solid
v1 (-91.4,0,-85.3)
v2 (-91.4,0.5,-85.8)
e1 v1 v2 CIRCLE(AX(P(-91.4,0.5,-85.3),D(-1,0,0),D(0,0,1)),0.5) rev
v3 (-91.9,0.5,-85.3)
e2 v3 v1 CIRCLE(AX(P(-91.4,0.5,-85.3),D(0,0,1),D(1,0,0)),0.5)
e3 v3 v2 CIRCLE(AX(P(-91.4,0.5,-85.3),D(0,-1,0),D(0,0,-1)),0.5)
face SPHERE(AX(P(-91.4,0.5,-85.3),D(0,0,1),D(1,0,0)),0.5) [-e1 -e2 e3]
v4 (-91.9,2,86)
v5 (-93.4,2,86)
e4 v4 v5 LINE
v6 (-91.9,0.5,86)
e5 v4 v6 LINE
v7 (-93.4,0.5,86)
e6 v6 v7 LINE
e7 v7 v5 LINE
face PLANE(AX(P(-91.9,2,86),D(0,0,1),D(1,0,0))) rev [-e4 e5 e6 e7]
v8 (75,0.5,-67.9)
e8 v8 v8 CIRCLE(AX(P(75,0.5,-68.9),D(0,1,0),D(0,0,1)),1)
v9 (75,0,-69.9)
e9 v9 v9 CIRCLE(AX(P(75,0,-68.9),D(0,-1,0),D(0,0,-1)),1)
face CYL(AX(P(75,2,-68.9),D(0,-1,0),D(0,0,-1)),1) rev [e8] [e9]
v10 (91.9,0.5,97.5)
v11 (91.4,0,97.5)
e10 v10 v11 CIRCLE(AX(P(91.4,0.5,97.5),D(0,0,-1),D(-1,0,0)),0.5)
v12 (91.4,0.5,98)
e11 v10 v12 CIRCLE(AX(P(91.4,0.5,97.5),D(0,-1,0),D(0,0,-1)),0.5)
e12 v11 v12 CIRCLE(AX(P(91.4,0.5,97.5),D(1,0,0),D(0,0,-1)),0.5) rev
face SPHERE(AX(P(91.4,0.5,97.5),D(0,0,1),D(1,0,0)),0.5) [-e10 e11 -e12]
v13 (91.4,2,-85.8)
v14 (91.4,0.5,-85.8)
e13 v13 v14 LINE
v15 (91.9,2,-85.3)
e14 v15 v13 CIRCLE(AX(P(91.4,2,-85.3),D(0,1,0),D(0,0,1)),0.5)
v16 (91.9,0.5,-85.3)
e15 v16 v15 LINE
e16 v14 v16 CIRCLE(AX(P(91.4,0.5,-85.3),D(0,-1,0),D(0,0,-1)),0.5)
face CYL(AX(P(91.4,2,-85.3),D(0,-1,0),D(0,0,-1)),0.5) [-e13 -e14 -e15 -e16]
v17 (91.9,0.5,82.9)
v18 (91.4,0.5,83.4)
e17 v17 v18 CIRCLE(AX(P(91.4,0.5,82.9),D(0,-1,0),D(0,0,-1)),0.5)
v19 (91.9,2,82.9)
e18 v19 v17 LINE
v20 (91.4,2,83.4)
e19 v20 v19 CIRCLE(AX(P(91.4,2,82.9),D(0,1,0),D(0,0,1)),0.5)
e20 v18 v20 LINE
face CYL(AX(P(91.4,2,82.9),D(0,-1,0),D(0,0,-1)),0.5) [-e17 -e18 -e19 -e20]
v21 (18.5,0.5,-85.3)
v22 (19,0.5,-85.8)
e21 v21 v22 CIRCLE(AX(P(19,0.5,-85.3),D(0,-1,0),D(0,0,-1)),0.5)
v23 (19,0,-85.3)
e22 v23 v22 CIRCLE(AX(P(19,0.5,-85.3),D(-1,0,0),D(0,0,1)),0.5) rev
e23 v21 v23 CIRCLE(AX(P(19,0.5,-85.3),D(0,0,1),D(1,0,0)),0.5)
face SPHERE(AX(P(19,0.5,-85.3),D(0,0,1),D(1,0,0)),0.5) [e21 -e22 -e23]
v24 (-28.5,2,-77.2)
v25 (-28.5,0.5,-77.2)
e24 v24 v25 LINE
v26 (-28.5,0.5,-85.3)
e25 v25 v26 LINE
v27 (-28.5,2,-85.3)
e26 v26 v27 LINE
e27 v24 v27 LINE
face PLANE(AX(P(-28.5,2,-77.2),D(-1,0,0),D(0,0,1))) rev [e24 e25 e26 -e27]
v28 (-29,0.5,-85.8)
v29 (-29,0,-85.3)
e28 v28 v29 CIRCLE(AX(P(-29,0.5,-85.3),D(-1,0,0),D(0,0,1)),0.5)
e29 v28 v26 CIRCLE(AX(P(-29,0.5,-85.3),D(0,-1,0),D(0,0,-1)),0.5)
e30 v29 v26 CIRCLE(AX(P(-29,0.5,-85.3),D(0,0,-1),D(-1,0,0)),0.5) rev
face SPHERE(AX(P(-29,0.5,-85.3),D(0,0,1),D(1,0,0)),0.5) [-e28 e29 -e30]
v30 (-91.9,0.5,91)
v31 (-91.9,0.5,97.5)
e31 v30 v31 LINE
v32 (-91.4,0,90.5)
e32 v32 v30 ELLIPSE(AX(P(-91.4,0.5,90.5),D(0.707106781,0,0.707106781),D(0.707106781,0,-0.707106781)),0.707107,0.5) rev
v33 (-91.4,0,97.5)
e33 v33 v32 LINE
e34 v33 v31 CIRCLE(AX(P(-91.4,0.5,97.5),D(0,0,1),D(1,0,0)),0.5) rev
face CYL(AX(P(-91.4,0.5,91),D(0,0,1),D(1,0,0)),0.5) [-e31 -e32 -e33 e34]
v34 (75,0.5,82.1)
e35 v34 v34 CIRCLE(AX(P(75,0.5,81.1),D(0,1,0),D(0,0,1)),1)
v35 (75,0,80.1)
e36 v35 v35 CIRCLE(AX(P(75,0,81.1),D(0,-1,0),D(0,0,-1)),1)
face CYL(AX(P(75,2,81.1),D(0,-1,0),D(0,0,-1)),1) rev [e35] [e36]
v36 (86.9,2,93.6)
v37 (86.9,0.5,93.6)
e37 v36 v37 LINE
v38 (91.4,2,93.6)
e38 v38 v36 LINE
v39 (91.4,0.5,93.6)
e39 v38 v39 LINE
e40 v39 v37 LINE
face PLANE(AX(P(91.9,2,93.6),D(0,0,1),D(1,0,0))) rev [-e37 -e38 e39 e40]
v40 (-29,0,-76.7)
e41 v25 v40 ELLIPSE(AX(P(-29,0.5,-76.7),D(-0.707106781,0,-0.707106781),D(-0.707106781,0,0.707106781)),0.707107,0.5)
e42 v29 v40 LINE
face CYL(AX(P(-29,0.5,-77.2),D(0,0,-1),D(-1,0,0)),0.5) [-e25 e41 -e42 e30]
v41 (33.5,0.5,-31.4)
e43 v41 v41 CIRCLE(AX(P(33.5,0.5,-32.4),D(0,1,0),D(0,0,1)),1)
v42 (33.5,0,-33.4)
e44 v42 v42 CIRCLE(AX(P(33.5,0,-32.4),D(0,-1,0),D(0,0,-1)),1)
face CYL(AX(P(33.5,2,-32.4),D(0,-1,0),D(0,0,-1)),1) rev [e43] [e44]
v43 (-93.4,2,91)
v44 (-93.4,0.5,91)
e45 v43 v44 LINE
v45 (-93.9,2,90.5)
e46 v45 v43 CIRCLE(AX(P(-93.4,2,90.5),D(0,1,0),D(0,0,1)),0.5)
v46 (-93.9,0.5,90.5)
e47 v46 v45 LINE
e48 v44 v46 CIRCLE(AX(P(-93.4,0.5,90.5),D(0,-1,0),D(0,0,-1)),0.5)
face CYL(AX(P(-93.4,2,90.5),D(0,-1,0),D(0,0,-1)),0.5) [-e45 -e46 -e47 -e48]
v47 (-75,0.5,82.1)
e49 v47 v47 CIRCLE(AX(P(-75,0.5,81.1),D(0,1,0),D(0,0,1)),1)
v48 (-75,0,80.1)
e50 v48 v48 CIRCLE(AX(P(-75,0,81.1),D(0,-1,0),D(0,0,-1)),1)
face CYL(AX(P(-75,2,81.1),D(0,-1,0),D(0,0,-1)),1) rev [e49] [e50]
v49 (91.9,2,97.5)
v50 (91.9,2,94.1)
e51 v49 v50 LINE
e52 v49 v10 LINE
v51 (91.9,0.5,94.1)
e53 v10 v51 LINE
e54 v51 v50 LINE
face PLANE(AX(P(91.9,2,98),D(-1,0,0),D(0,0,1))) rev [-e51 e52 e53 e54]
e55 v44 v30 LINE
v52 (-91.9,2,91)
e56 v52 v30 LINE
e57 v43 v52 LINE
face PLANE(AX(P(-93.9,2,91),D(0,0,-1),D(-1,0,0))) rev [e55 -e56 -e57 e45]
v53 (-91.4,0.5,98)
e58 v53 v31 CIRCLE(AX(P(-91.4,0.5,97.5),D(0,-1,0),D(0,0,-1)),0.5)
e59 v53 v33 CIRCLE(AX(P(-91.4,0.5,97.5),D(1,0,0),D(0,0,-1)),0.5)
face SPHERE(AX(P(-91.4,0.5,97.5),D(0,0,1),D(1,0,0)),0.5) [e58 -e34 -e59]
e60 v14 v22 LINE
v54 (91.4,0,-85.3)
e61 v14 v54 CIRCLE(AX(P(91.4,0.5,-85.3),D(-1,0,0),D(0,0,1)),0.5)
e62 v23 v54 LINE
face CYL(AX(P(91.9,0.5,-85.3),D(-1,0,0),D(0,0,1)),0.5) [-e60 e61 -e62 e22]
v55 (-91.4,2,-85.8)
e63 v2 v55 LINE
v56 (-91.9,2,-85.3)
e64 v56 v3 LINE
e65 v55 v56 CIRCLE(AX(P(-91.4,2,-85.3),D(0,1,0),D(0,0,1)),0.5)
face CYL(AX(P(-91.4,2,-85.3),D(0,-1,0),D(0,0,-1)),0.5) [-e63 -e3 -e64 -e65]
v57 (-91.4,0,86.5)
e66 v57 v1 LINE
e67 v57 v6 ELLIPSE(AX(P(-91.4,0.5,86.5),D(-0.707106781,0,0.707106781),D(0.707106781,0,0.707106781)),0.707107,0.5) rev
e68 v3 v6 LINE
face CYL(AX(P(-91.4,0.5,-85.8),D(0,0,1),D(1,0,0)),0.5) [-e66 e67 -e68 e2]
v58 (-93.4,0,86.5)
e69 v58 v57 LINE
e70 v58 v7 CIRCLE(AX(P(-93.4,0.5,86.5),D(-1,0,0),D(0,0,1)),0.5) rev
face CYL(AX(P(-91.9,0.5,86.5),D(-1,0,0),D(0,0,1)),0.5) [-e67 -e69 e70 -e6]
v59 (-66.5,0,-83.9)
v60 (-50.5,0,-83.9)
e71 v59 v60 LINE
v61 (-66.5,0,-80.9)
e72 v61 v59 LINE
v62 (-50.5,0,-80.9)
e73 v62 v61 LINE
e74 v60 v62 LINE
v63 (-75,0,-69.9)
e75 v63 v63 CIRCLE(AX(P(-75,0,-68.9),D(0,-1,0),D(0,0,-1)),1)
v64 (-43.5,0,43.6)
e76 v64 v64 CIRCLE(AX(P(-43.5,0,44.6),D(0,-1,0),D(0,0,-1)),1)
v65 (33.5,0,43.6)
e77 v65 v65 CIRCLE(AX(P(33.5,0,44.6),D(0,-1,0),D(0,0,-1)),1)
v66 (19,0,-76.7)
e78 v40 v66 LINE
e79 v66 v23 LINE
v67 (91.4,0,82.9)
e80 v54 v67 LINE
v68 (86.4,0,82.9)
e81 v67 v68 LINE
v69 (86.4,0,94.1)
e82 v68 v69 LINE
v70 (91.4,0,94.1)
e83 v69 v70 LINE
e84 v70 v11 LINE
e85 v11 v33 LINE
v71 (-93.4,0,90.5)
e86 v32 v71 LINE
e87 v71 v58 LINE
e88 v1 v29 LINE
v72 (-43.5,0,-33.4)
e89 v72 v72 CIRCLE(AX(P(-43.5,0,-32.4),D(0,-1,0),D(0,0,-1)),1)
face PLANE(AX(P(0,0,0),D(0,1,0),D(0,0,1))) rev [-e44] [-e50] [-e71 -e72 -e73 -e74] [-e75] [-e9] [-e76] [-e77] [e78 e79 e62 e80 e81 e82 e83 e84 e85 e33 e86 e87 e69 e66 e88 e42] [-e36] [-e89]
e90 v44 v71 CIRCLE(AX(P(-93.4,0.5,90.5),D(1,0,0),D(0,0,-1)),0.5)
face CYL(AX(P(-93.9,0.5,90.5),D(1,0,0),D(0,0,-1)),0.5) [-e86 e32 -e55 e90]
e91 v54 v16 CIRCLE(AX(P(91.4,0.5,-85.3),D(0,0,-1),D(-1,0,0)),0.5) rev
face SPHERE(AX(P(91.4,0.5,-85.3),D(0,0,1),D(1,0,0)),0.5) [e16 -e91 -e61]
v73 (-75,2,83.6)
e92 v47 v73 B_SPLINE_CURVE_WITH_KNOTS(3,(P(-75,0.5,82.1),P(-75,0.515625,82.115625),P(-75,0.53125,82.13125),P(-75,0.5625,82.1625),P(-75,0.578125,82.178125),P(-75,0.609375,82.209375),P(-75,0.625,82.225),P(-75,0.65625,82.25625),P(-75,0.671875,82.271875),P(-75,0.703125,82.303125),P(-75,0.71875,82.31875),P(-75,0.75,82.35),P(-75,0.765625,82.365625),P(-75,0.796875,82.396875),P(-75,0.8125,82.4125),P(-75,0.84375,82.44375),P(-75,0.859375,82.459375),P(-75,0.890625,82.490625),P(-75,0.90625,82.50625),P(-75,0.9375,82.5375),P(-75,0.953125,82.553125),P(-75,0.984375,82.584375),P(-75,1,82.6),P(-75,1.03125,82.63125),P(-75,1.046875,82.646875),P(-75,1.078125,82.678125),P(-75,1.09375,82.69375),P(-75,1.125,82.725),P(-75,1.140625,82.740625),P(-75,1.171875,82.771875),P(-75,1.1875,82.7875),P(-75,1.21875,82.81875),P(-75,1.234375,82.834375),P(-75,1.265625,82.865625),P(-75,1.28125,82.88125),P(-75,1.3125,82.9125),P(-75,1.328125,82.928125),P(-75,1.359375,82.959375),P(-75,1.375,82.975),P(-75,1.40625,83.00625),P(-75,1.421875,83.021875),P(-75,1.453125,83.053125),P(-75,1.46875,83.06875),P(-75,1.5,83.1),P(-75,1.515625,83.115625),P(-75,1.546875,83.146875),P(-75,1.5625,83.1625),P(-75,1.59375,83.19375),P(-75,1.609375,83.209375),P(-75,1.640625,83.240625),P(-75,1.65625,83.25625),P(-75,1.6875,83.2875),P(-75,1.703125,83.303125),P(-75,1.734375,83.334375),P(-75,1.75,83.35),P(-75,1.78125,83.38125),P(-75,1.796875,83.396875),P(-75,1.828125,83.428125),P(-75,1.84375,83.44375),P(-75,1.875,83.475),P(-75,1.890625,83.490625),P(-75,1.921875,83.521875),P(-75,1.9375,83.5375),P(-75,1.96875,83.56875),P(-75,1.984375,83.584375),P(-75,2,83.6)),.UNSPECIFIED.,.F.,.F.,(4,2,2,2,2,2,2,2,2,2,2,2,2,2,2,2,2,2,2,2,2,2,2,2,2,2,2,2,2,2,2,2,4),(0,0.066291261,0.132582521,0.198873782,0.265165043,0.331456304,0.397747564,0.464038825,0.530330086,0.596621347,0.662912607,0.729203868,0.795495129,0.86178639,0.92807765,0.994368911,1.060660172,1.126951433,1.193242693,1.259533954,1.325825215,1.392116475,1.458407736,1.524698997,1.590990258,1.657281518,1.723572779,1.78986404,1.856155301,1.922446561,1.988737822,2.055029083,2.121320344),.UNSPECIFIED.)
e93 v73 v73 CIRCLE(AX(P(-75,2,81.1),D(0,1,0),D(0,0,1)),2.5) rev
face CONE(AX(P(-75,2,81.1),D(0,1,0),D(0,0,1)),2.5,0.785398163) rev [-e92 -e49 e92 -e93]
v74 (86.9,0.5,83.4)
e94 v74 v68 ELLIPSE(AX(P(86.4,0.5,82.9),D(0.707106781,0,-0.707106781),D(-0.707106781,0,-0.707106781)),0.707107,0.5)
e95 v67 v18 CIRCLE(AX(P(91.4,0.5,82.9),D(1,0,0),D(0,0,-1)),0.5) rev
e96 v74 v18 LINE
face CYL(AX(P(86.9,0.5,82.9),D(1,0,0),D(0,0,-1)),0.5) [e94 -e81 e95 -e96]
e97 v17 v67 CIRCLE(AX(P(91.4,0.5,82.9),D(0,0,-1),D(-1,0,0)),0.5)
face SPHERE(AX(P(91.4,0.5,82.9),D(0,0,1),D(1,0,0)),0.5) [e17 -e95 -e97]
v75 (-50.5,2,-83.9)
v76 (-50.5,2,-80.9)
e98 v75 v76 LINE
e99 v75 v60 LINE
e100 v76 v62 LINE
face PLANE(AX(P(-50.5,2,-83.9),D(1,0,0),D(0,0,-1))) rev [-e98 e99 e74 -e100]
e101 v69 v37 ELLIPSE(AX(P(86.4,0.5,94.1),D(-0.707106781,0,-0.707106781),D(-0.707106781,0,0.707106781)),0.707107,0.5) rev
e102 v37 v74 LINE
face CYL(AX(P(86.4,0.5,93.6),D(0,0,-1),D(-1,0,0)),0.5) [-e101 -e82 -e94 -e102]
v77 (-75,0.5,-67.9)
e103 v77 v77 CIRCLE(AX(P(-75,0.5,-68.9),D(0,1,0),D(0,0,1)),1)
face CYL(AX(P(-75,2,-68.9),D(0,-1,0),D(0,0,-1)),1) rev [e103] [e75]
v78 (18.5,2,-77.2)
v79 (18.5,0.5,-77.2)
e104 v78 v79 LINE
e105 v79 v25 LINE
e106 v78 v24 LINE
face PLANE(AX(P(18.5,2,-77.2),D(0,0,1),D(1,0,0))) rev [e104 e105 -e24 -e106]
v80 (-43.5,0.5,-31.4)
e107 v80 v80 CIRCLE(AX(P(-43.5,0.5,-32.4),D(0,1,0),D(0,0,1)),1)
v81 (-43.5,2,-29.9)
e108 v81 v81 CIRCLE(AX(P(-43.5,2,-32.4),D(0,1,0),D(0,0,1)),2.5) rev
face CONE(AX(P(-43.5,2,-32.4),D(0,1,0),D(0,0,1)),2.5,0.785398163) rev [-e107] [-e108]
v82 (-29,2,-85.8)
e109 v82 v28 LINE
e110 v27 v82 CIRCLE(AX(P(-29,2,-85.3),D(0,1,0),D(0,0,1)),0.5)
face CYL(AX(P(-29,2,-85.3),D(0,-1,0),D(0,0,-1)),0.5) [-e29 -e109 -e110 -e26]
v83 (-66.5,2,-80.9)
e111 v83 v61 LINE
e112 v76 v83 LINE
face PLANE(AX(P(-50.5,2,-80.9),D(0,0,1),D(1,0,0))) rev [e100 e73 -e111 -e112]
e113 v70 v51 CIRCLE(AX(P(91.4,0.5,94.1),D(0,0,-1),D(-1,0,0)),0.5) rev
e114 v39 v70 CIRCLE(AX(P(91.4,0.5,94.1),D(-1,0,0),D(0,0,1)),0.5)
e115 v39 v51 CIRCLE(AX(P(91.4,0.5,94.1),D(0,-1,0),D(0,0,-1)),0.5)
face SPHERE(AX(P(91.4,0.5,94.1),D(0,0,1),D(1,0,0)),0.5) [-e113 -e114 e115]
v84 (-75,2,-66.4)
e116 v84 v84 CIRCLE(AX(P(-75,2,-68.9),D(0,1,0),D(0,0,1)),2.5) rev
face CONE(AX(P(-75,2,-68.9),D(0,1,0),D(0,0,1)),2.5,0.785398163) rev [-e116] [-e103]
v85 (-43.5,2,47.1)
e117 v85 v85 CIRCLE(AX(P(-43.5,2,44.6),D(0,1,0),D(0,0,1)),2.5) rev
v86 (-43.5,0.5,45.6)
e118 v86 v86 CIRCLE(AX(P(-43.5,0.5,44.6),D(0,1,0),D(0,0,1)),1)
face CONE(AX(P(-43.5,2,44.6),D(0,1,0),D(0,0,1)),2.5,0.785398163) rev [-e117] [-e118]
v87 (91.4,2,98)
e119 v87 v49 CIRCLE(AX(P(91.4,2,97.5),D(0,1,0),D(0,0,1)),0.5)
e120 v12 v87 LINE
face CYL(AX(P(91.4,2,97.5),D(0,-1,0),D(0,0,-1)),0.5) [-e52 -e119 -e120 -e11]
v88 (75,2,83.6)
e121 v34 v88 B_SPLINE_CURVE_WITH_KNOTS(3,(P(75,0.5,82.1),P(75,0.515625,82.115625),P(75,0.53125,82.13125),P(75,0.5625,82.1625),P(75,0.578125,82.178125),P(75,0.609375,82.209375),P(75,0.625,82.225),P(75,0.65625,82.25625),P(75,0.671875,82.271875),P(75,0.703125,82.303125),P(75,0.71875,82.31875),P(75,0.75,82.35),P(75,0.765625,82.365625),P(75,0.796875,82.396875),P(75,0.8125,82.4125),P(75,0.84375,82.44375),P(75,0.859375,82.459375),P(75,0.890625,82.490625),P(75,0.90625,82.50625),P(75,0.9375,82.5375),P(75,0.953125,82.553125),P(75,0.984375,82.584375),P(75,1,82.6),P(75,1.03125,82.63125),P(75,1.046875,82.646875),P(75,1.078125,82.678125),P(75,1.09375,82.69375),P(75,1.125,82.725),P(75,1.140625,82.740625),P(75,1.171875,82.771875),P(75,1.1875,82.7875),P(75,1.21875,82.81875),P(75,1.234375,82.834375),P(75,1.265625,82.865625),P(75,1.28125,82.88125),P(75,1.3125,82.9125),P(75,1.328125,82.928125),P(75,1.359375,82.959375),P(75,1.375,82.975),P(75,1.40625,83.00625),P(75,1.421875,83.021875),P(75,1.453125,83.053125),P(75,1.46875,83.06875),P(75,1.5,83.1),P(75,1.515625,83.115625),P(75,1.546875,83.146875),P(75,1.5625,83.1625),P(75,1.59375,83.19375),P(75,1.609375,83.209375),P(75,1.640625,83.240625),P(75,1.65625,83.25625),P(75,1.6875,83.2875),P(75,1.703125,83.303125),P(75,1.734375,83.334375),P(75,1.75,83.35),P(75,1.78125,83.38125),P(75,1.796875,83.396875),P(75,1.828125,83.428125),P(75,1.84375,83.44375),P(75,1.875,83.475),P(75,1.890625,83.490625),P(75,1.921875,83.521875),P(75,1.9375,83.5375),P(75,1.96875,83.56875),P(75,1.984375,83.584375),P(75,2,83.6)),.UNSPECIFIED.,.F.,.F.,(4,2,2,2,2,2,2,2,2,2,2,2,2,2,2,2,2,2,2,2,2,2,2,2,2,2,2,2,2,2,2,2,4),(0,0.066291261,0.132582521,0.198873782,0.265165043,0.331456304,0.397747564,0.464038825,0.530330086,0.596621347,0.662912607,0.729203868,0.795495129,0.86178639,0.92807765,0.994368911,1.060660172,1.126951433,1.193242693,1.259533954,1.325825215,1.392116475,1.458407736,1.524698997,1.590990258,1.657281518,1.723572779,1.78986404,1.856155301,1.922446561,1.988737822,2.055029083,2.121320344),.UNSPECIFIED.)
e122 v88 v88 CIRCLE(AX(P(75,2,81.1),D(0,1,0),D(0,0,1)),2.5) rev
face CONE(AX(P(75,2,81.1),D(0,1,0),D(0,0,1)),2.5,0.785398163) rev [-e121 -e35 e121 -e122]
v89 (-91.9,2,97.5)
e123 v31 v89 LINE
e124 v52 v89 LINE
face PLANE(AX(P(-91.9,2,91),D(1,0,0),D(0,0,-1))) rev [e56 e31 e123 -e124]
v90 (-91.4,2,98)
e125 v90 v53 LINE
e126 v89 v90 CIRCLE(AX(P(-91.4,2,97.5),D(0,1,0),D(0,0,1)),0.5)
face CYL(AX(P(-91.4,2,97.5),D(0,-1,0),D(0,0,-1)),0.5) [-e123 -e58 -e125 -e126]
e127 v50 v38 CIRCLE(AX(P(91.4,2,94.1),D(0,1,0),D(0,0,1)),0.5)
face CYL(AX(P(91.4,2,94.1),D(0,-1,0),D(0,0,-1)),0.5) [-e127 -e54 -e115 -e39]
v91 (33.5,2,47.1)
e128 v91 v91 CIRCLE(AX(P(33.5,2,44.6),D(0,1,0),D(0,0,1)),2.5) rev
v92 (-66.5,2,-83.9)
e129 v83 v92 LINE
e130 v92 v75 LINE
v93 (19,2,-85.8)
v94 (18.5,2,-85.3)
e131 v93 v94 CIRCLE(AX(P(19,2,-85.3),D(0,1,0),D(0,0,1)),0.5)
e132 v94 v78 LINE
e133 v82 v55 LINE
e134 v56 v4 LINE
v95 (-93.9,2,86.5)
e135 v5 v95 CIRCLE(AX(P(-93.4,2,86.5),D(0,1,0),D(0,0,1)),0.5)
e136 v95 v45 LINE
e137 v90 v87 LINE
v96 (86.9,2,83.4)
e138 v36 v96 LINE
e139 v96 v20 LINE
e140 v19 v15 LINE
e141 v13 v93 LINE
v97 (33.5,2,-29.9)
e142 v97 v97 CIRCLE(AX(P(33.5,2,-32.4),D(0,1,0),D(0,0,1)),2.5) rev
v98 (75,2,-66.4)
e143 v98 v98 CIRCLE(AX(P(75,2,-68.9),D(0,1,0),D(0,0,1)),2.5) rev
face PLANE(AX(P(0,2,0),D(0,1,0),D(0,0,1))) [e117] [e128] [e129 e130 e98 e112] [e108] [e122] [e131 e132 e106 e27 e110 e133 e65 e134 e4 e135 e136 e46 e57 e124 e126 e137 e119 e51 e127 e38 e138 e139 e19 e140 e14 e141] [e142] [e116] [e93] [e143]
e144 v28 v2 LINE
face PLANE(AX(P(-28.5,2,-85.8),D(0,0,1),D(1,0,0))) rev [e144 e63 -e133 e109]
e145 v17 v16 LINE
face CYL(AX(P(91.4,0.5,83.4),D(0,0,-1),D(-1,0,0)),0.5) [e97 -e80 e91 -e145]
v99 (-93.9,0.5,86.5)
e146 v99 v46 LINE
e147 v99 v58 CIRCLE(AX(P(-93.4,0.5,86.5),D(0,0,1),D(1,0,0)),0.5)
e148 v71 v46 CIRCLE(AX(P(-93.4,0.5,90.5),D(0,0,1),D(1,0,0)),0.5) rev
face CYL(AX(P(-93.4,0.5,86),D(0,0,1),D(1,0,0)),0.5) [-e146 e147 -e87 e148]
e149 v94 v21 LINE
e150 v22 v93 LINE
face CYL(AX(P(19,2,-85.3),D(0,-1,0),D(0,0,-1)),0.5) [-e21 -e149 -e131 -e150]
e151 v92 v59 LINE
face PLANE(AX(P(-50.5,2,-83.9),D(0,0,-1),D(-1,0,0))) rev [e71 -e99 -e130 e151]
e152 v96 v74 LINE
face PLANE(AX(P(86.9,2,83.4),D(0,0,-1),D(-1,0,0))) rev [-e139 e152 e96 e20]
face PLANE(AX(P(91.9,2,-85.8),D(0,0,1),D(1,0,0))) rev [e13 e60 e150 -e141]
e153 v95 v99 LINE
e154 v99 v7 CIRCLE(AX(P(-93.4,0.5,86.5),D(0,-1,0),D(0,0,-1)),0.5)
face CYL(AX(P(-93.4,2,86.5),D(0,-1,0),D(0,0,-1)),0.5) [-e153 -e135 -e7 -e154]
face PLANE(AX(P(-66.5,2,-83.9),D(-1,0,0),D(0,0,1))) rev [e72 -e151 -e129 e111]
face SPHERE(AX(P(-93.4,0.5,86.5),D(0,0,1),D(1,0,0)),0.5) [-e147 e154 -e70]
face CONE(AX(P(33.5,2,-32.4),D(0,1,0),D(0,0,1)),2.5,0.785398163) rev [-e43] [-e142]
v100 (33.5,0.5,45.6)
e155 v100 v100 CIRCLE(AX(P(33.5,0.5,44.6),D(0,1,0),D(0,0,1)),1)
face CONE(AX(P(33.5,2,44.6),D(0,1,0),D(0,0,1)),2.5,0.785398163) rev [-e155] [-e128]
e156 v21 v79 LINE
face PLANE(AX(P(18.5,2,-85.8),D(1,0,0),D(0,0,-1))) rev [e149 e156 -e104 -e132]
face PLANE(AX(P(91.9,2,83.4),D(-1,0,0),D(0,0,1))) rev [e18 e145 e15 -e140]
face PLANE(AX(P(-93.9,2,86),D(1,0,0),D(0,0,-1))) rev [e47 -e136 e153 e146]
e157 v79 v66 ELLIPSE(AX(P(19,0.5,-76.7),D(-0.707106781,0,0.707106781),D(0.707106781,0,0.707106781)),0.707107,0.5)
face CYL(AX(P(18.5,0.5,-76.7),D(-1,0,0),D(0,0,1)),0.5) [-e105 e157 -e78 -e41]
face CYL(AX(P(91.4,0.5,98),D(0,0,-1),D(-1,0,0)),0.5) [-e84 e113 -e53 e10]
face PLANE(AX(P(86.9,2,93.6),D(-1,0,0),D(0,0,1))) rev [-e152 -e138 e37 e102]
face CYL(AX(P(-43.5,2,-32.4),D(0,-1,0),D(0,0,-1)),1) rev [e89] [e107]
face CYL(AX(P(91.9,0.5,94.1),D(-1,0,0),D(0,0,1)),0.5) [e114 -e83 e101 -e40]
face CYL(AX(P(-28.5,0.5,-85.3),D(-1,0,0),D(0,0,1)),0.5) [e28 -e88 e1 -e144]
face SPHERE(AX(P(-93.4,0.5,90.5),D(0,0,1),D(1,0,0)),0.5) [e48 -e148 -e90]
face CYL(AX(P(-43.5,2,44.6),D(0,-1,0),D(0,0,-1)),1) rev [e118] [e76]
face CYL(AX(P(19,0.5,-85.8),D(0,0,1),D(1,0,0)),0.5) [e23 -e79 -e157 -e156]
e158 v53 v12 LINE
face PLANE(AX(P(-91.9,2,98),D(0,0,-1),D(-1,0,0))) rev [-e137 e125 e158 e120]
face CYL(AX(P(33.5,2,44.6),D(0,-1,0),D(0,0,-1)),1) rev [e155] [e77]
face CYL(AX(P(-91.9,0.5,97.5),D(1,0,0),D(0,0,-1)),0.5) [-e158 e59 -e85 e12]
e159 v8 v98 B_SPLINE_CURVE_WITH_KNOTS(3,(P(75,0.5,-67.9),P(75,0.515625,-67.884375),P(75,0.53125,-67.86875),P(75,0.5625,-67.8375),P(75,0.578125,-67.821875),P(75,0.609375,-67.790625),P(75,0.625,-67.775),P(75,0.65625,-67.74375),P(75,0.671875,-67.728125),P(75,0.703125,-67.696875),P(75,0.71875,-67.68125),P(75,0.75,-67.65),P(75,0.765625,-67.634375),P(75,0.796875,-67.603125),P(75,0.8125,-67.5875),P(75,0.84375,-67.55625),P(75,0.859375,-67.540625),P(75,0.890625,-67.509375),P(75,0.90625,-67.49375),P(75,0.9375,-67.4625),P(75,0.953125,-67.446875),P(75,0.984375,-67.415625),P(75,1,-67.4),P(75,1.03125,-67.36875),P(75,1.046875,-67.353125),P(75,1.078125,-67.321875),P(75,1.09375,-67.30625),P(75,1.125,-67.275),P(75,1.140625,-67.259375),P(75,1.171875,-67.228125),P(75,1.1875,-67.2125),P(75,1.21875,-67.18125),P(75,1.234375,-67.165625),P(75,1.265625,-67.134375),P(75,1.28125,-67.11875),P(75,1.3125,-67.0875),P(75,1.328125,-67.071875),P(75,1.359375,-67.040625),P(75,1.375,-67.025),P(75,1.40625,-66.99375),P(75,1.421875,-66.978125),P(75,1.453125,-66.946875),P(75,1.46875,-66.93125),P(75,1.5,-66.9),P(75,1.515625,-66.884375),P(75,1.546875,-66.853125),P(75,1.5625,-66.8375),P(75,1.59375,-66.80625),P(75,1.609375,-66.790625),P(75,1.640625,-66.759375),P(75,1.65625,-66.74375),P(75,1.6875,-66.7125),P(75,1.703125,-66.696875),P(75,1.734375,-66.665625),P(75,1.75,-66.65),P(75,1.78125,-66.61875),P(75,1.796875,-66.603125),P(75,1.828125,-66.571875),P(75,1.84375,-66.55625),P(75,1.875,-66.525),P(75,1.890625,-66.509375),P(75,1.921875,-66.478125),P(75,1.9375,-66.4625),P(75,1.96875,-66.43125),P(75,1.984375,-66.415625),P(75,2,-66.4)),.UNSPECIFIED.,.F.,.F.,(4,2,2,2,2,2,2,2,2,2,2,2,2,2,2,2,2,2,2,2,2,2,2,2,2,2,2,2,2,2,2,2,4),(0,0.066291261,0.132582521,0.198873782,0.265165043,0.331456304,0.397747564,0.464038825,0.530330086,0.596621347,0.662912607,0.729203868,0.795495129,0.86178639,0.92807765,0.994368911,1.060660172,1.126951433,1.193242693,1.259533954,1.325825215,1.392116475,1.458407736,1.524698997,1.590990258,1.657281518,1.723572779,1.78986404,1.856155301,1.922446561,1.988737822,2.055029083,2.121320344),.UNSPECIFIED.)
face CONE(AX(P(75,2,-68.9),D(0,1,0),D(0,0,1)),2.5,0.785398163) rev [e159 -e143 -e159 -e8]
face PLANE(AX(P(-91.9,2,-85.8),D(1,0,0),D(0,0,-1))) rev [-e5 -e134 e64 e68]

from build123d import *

# Parameters (mm, degrees)
BOSS_EXTRUDE1_DEPTH = 2
SKETCH2_R           = 1
CUT_EXTRUDE1_DEPTH  = 136.739493148
CHAMFER1_SIZE       = 1.5
CHAMFER2_SIZE       = 1.5
FILLET1_R           = 0.5
FILLET2_R           = 0.5
SKETCH3_W           = 16
SKETCH3_H           = 3
CUT_EXTRUDE2_DEPTH  = 136.739493148


with BuildPart() as part:
    # Sketch1 → Boss-Extrude1 (new body)
    with BuildSketch(Plane(origin=(0, 0, 0), x_dir=(1, 0, 0), z_dir=(0, 1, 0))):
        Polygon((-91.9, 85.8), (-91.9, -86), (-93.9, -86), (-93.9, -91), (-91.9, -91), (-91.9, -98), (91.9, -98), (91.9, -93.6), (86.9, -93.6), (86.9, -83.4), (91.9, -83.4), (91.9, 85.8), (18.5, 85.8), (18.5, 77.2), (-28.5, 77.2), (-28.5, 85.8), align=None)
    extrude(amount=BOSS_EXTRUDE1_DEPTH)

    # Sketch2 → Cut-Extrude1 (cut, through all)
    with BuildSketch(Plane.XZ):
        with Locations(Location((75, -68.9, 0), (0, 0, 270))):
            Circle(SKETCH2_R)
        with Locations(Location((-75, -68.9, 0), (0, 0, 270))):
            Circle(SKETCH2_R)
        with Locations(Location((-75, 81.1, 0), (0, 0, 270))):
            Circle(SKETCH2_R)
        with Locations(Location((75, 81.1, 0), (0, 0, 270))):
            Circle(SKETCH2_R)
        with Locations(Location((33.5, -32.4, 0), (0, 0, 270))):
            Circle(SKETCH2_R)
        with Locations(Location((-43.5, -32.4, 0), (0, 0, 270))):
            Circle(SKETCH2_R)
        with Locations(Location((-43.5, 44.6, 0), (0, 0, 270))):
            Circle(SKETCH2_R)
        with Locations(Location((33.5, 44.6, 0), (0, 0, 270))):
            Circle(SKETCH2_R)
    extrude(amount=-CUT_EXTRUDE1_DEPTH, mode=Mode.SUBTRACT)

    # Chamfer1
    chamfer1_edges = [part.edges().sort_by_distance(p)[0] for p in [
        (-75, 2, -67.9),
    ]]
    chamfer(chamfer1_edges, length=CHAMFER1_SIZE)

    # Chamfer2
    chamfer2_edges = [part.edges().sort_by_distance(p)[0] for p in [
        (-75, 2, 82.1),
        (75, 2, 82.1),
        (33.5, 2, -31.4),
        (-43.5, 2, -31.4),
        (-43.5, 2, 45.6),
        (33.5, 2, 45.6),
        (75, 2, -67.9),
    ]]
    chamfer(chamfer2_edges, length=CHAMFER2_SIZE)

    # Fillet1
    fillet1_edges = [part.edges().sort_by_distance(p)[0] for p in [
        (-28.5, 0, -81.5),
        (-5, 0, -77.2),
        (18.5, 0, -81.5),
        (55.2, 0, -85.8),
        (91.9, 0, -1.2),
        (89.4, 0, 83.4),
        (86.9, 0, 88.5),
        (89.4, 0, 93.6),
        (91.9, 0, 95.8),
        (0, 0, 98),
        (-91.9, 0, 94.5),
        (-92.9, 0, 91),
        (-93.9, 0, 88.5),
        (-92.9, 0, 86),
        (-91.9, 0, 0.1),
        (-60.2, 0, -85.8),
    ]]
    fillet(fillet1_edges, radius=FILLET1_R)

    # Fillet2
    # the kernel refuses this fillet: 0.5 mm, written as the material it takes off along each edge
    with BuildSketch(Plane(origin=(91.4, 0.5, 82.9), x_dir=(0, 0, 1), z_dir=(1, 0, 0))) as fillet2_piece_1_section:
        Polygon((0, 0), (FILLET2_R, 0), (FILLET2_R, FILLET2_R), (0, FILLET2_R), align=None)
    fillet2_piece_1 = extrude(amount=FILLET2_R, mode=Mode.PRIVATE)
    fillet2_piece_1 = fillet2_piece_1 - Plane(origin=(91.4, 0.5, 82.9), x_dir=(0, 0.7071067811865475, -0.7071067811865475), z_dir=(1, 0, 0)) * Sphere(FILLET2_R, mode=Mode.PRIVATE)
    add(fillet2_piece_1, mode=Mode.SUBTRACT)
    with BuildSketch(Plane(origin=(91.4, 0.5, 94.1), x_dir=(0, 0, -1), z_dir=(1, 0, 0))) as fillet2_piece_2_section:
        Polygon((0, 0), (FILLET2_R, 0), (FILLET2_R, -FILLET2_R), (0, -FILLET2_R), align=None)
    fillet2_piece_2 = extrude(amount=FILLET2_R, mode=Mode.PRIVATE)
    fillet2_piece_2 = fillet2_piece_2 - Plane(origin=(91.4, 0.5, 94.1), x_dir=(0, 0.7071067811865475, 0.7071067811865475), z_dir=(1, 0, 0)) * Sphere(FILLET2_R, mode=Mode.PRIVATE)
    add(fillet2_piece_2, mode=Mode.SUBTRACT)
    with BuildSketch(Plane(origin=(91.4, 0.5, -85.3), x_dir=(1, 0, 0), z_dir=(0, 0, -1))) as fillet2_piece_3_section:
        Polygon((0, 0), (FILLET2_R, 0), (FILLET2_R, FILLET2_R), (0, FILLET2_R), align=None)
    fillet2_piece_3 = extrude(amount=FILLET2_R, mode=Mode.PRIVATE)
    fillet2_piece_3 = fillet2_piece_3 - Plane(origin=(91.4, 0.5, -85.3), x_dir=(-0.7071067811865475, 0.7071067811865475, 0), z_dir=(0, 0, -1)) * Sphere(FILLET2_R, mode=Mode.PRIVATE)
    add(fillet2_piece_3, mode=Mode.SUBTRACT)
    with BuildSketch(Plane(origin=(91.4, 0.5, 97.5), x_dir=(1, 0, 0), z_dir=(0, 0, 1))) as fillet2_piece_4_section:
        Polygon((0, 0), (FILLET2_R, 0), (FILLET2_R, -FILLET2_R), (0, -FILLET2_R), align=None)
    fillet2_piece_4 = extrude(amount=FILLET2_R, mode=Mode.PRIVATE)
    fillet2_piece_4 = fillet2_piece_4 - Plane(origin=(91.4, 0.5, 97.5), x_dir=(-0.7071067811865475, 0.7071067811865475, 0), z_dir=(0, 0, 1)) * Sphere(FILLET2_R, mode=Mode.PRIVATE)
    add(fillet2_piece_4, mode=Mode.SUBTRACT)
    with BuildSketch(Plane(origin=(19, 0.5, -85.3), x_dir=(0, 0, -1), z_dir=(-1, 0, 0))) as fillet2_piece_5_section:
        Polygon((0, 0), (FILLET2_R, 0), (FILLET2_R, FILLET2_R), (0, FILLET2_R), align=None)
    fillet2_piece_5 = extrude(amount=FILLET2_R, mode=Mode.PRIVATE)
    fillet2_piece_5 = fillet2_piece_5 - Plane(origin=(19, 0.5, -85.3), x_dir=(0, 0.7071067811865475, 0.7071067811865475), z_dir=(-1, 0, 0)) * Sphere(FILLET2_R, mode=Mode.PRIVATE)
    add(fillet2_piece_5, mode=Mode.SUBTRACT)
    with BuildSketch(Plane(origin=(-91.4, 0.5, 97.5), x_dir=(0, 0, 1), z_dir=(-1, 0, 0))) as fillet2_piece_6_section:
        Polygon((0, 0), (FILLET2_R, 0), (FILLET2_R, -FILLET2_R), (0, -FILLET2_R), align=None)
    fillet2_piece_6 = extrude(amount=FILLET2_R, mode=Mode.PRIVATE)
    fillet2_piece_6 = fillet2_piece_6 - Plane(origin=(-91.4, 0.5, 97.5), x_dir=(0, 0.7071067811865475, -0.7071067811865475), z_dir=(-1, 0, 0)) * Sphere(FILLET2_R, mode=Mode.PRIVATE)
    add(fillet2_piece_6, mode=Mode.SUBTRACT)
    with BuildSketch(Plane(origin=(-93.4, 0.5, 90.5), x_dir=(0, 0, 1), z_dir=(-1, 0, 0))) as fillet2_piece_7_section:
        Polygon((0, 0), (FILLET2_R, 0), (FILLET2_R, -FILLET2_R), (0, -FILLET2_R), align=None)
    fillet2_piece_7 = extrude(amount=FILLET2_R, mode=Mode.PRIVATE)
    fillet2_piece_7 = fillet2_piece_7 - Plane(origin=(-93.4, 0.5, 90.5), x_dir=(0, 0.7071067811865475, -0.7071067811865475), z_dir=(-1, 0, 0)) * Sphere(FILLET2_R, mode=Mode.PRIVATE)
    add(fillet2_piece_7, mode=Mode.SUBTRACT)
    with BuildSketch(Plane(origin=(-29, 0.5, -85.3), x_dir=(1, 0, 0), z_dir=(0, 0, -1))) as fillet2_piece_8_section:
        Polygon((0, 0), (FILLET2_R, 0), (FILLET2_R, FILLET2_R), (0, FILLET2_R), align=None)
    fillet2_piece_8 = extrude(amount=FILLET2_R, mode=Mode.PRIVATE)
    fillet2_piece_8 = fillet2_piece_8 - Plane(origin=(-29, 0.5, -85.3), x_dir=(-0.7071067811865475, 0.7071067811865475, 0), z_dir=(0, 0, -1)) * Sphere(FILLET2_R, mode=Mode.PRIVATE)
    add(fillet2_piece_8, mode=Mode.SUBTRACT)
    with BuildSketch(Plane(origin=(-93.4, 0.5, 86.5), x_dir=(-1, 0, 0), z_dir=(0, 0, -1))) as fillet2_piece_9_section:
        Polygon((0, 0), (FILLET2_R, 0), (FILLET2_R, -FILLET2_R), (0, -FILLET2_R), align=None)
    fillet2_piece_9 = extrude(amount=FILLET2_R, mode=Mode.PRIVATE)
    fillet2_piece_9 = fillet2_piece_9 - Plane(origin=(-93.4, 0.5, 86.5), x_dir=(0.7071067811865475, 0.7071067811865475, 0), z_dir=(0, 0, -1)) * Sphere(FILLET2_R, mode=Mode.PRIVATE)
    add(fillet2_piece_9, mode=Mode.SUBTRACT)
    with BuildSketch(Plane(origin=(-91.4, 0.5, -85.3), x_dir=(0, 0, -1), z_dir=(-1, 0, 0))) as fillet2_piece_10_section:
        Polygon((0, 0), (FILLET2_R, 0), (FILLET2_R, FILLET2_R), (0, FILLET2_R), align=None)
    fillet2_piece_10 = extrude(amount=FILLET2_R, mode=Mode.PRIVATE)
    fillet2_piece_10 = fillet2_piece_10 - Plane(origin=(-91.4, 0.5, -85.3), x_dir=(0, 0.7071067811865475, 0.7071067811865475), z_dir=(-1, 0, 0)) * Sphere(FILLET2_R, mode=Mode.PRIVATE)
    add(fillet2_piece_10, mode=Mode.SUBTRACT)
    with BuildSketch(Plane(origin=(-28.5, 0.5, -85.8), x_dir=(-1, 0, 0), z_dir=(0, 1, 0)), Plane(origin=(18.5, 0.5, -85.8), x_dir=(0, 0, 1), z_dir=(0, 1, 0)), Plane(origin=(91.9, 0.5, -85.8), x_dir=(-1, 0, 0), z_dir=(0, 1, 0)), Plane(origin=(91.9, 0.5, 83.4), x_dir=(0, 0, -1), z_dir=(0, 1, 0)), Plane(origin=(-91.9, 0.5, -85.8), x_dir=(0, 0, 1), z_dir=(0, 1, 0))) as fillet2_piece_11:
        with BuildLine():
            CenterArc((FILLET2_R, FILLET2_R), FILLET2_R, 180, 90)
            Line((0, FILLET2_R), (0, 0))
            Line((0, 0), (FILLET2_R, 0))
        make_face()
    extrude(amount=2.75, mode=Mode.SUBTRACT)
    with BuildSketch(Plane(origin=(91.9, 0.5, 93.6), x_dir=(0, 0, 1), z_dir=(0, 1, 0)), Plane(origin=(91.9, 0.5, 98), x_dir=(-1, 0, 0), z_dir=(0, 1, 0)), Plane(origin=(-91.9, 0.5, 98), x_dir=(0, 0, -1), z_dir=(0, 1, 0)), Plane(origin=(-93.9, 0.5, 91), x_dir=(0, 0, -1), z_dir=(0, 1, 0)), Plane(origin=(-93.9, 0.5, 86), x_dir=(1, 0, 0), z_dir=(0, 1, 0))) as fillet2_piece_12:
        with BuildLine():
            CenterArc((FILLET2_R, -FILLET2_R), FILLET2_R, 90, 90)
            Line((0, -FILLET2_R), (0, 0))
            Line((0, 0), (FILLET2_R, 0))
        make_face()
    extrude(amount=2.75, mode=Mode.SUBTRACT)

    # Sketch3 → Cut-Extrude2 (cut, through all)
    with BuildSketch(Plane.XZ):
        with Locations((-58.5, -82.4)):
            Rectangle(SKETCH3_W, SKETCH3_H)
    extrude(amount=-CUT_EXTRUDE2_DEPTH, mode=Mode.SUBTRACT)


solid = part.part
